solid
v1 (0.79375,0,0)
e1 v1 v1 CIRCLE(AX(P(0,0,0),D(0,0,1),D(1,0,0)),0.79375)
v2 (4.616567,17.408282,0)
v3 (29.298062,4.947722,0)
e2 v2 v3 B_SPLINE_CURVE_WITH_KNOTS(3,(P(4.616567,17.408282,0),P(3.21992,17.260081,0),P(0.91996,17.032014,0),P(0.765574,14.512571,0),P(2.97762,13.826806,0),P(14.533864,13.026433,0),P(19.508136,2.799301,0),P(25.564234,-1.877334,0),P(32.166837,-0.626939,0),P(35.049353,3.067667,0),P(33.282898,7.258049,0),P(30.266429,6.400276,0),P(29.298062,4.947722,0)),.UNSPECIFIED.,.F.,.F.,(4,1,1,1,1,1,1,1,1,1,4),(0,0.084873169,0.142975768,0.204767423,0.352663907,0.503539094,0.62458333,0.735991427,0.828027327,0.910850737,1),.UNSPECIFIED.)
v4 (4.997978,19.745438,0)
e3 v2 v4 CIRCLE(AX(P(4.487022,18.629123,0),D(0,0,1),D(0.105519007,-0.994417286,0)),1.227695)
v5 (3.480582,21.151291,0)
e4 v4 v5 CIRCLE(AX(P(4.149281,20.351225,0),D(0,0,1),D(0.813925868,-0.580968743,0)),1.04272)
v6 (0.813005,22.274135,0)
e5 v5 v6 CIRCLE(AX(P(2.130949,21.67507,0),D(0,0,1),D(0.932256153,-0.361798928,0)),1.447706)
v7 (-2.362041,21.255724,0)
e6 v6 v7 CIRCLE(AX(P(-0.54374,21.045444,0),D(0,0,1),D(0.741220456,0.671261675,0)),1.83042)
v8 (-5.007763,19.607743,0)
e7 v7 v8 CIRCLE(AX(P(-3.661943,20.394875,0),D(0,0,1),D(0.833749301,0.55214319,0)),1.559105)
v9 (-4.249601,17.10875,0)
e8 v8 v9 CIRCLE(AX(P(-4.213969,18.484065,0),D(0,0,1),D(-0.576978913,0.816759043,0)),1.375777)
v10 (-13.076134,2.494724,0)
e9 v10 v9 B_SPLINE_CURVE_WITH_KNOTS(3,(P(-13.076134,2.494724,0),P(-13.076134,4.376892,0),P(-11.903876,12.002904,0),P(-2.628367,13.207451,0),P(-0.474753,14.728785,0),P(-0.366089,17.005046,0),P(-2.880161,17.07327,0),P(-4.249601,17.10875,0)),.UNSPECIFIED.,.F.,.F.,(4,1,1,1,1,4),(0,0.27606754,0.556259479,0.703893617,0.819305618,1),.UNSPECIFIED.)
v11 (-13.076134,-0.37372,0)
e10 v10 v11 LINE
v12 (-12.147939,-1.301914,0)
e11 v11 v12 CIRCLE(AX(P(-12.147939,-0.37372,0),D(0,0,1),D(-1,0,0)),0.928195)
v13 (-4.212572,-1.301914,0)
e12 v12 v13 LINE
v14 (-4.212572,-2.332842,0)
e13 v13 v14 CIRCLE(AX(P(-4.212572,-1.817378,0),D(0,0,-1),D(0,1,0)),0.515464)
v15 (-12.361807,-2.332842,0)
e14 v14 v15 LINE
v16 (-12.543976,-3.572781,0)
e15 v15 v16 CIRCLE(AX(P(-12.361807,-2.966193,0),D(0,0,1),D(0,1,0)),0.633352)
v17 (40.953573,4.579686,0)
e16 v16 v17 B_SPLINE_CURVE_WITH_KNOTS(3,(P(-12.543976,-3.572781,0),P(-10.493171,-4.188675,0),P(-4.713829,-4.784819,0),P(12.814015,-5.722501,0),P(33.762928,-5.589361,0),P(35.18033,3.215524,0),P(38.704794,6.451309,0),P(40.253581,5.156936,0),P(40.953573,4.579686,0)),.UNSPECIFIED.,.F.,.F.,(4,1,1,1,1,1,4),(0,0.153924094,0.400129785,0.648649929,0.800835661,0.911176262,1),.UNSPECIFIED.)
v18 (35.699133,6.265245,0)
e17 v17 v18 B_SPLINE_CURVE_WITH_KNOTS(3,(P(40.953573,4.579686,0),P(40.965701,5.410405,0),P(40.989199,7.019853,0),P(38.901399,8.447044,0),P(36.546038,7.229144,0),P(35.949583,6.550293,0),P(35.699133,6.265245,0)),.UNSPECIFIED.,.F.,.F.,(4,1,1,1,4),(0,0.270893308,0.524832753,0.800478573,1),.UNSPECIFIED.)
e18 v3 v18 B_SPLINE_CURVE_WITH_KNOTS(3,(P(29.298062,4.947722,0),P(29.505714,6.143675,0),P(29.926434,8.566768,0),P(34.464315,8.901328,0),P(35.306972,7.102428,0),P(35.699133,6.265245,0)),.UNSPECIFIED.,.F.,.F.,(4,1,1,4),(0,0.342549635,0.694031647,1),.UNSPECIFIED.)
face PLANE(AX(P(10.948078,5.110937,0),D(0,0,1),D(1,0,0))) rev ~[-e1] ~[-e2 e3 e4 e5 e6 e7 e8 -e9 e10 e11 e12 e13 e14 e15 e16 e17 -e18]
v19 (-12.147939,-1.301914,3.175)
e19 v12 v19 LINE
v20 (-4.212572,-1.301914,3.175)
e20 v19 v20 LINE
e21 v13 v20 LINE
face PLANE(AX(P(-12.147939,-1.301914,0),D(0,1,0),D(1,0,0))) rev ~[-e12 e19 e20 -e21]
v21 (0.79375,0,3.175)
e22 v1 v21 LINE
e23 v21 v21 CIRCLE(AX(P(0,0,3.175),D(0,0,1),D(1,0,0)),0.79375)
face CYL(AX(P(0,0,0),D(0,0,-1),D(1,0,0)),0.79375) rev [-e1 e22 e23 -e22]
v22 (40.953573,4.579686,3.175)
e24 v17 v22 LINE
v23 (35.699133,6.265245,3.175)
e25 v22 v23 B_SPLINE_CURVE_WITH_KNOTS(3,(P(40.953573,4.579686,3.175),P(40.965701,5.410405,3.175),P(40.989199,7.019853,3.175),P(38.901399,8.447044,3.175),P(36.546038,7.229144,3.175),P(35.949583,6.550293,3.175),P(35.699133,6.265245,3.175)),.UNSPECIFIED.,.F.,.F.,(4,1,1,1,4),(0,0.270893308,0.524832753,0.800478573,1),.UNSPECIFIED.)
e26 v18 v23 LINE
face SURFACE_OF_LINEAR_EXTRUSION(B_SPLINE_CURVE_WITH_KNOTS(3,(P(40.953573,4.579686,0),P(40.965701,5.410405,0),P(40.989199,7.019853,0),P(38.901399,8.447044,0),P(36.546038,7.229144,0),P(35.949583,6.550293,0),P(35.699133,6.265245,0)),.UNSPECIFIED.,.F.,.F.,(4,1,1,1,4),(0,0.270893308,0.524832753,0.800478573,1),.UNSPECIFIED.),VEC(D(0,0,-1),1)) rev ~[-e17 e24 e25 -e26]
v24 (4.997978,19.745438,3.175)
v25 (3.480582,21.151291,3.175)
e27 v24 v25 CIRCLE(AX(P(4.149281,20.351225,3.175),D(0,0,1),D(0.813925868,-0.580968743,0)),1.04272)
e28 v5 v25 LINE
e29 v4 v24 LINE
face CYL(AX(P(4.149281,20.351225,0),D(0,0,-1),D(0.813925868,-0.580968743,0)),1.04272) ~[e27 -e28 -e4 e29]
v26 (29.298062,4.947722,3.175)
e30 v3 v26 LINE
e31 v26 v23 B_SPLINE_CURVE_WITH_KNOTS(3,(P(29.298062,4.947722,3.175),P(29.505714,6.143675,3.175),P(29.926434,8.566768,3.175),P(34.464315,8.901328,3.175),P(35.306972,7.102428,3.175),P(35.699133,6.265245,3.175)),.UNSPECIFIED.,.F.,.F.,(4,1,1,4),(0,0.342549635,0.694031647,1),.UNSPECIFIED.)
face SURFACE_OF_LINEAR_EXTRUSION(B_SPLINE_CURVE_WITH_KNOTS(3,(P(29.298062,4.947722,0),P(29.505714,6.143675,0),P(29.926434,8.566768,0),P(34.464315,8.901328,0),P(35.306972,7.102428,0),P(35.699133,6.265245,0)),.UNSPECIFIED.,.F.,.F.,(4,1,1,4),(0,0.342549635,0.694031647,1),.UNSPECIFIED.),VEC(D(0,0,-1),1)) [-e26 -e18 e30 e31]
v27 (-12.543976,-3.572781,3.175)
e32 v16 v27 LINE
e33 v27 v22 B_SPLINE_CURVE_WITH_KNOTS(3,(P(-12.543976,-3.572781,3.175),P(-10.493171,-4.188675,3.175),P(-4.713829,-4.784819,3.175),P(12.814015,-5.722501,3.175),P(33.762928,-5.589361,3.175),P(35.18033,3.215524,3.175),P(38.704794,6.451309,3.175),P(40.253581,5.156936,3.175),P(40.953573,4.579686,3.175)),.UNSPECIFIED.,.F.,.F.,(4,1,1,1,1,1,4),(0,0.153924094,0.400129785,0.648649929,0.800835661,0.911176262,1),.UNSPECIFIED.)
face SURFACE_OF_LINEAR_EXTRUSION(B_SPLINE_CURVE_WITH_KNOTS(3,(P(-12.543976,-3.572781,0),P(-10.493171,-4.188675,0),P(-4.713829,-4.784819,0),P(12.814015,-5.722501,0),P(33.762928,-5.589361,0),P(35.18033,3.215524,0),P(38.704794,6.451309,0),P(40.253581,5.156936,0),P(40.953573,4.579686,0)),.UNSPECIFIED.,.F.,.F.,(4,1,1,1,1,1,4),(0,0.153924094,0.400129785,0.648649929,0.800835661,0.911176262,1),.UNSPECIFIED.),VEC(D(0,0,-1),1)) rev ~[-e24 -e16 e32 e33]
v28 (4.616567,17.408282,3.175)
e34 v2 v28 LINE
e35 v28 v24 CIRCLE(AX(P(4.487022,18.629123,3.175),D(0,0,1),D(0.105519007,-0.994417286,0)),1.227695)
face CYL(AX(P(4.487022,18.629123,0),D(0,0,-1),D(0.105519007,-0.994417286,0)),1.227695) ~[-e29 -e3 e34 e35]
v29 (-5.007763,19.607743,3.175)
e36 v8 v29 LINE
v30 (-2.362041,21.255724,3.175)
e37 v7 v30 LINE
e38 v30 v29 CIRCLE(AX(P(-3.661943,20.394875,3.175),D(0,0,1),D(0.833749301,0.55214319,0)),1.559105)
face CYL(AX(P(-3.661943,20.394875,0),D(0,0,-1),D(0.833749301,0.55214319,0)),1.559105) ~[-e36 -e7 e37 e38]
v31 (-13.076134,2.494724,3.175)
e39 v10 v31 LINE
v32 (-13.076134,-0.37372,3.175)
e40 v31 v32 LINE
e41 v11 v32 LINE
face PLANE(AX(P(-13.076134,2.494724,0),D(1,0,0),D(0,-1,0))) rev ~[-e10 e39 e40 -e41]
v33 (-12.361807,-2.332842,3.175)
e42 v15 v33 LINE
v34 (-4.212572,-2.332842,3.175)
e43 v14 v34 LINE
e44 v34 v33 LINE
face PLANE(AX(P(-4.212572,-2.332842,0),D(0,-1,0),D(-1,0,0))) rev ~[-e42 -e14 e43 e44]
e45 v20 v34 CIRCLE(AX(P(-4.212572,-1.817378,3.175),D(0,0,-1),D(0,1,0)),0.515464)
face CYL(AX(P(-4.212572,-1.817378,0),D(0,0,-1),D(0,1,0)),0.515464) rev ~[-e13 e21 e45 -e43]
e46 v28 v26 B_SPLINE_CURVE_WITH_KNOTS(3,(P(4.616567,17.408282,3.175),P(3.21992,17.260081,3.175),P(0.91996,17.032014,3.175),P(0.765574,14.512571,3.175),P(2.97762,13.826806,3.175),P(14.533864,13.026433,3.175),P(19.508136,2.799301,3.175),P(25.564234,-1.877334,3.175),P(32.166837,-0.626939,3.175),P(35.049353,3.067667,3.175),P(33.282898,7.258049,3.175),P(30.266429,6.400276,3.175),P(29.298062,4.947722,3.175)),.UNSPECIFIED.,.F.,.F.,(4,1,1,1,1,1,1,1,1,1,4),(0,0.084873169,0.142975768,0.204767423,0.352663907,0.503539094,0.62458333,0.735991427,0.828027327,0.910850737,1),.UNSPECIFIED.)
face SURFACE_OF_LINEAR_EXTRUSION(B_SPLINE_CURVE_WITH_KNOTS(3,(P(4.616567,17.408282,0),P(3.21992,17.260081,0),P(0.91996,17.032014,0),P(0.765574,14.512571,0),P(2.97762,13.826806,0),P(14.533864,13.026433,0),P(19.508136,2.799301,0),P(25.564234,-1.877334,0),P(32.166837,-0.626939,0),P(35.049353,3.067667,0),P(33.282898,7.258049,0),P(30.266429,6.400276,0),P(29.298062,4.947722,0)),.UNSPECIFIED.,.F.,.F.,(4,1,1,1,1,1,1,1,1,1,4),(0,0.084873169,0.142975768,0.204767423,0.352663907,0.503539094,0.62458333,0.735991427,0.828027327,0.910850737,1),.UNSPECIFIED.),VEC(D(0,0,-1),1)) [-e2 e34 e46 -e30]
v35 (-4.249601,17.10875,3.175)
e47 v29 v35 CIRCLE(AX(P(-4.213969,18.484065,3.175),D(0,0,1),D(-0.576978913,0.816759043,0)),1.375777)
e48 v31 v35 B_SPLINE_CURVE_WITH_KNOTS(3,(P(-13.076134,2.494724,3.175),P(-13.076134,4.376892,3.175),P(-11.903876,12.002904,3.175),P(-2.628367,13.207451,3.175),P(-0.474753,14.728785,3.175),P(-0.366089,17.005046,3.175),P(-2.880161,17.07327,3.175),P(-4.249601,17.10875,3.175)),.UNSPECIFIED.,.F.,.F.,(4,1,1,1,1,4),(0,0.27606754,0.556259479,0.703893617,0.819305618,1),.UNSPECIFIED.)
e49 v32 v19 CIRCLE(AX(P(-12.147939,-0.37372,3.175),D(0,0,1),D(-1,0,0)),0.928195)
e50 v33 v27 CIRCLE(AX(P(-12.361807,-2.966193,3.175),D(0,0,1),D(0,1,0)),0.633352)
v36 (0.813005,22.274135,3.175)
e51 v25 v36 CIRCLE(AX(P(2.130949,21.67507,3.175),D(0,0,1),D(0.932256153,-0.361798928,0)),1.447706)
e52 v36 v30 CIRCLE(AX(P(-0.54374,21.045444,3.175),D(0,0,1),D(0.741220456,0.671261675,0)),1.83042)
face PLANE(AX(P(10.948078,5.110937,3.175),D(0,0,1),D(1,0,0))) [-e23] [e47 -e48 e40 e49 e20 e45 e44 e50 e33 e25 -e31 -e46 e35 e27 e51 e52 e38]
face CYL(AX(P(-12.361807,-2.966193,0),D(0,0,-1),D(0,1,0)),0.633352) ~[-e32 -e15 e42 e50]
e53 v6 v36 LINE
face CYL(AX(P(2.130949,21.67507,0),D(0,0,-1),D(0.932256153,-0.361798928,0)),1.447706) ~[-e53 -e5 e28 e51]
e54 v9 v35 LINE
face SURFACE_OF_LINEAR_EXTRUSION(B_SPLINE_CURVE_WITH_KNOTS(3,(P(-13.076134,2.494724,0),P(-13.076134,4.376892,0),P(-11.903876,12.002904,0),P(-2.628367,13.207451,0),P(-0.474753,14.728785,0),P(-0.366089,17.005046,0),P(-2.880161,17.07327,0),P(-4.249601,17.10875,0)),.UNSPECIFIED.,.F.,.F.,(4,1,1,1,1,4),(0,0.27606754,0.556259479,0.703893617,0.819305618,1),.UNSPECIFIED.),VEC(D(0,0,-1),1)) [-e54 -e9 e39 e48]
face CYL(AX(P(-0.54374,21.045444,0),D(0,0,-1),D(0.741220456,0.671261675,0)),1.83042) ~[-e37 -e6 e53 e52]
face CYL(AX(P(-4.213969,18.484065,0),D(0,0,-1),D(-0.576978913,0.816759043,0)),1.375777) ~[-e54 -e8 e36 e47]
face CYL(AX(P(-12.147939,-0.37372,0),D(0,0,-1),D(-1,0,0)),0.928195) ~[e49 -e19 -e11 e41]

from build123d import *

# Parameters (mm, degrees)
F0_R     = 0.79375
F1_DEPTH = 3.175


with BuildPart() as f1:
    # F0 (on Top) → F1 (new body)
    with BuildSketch(Plane.XY):
        with BuildLine():
            Line((-12.1479392274, -1.3019143497), (-4.2125724058, -1.3019143497))
            ThreePointArc((-4.2125724058, -1.3019143497), (-3.6971087737, -1.8173779818), (-4.2125724058, -2.3328416139))
            Line((-4.2125724058, -2.3328416139), (-12.3618070082, -2.3328416139))
            ThreePointArc((-12.3618070082, -2.3328416139), (-12.9884320145, -2.8741308978), (-12.5439763069, -3.5727811046))
            add(Edge.make_bspline(
                [(-12.5439763069, -3.5727811046), (-10.4931714013, -4.1886749677), (-4.7138291604, -4.7848193904), (12.8140150399, -5.7225010361), (33.7629279781, -5.5893612026), (35.1803298379, 3.2155238376), (38.704793611, 6.4513086996), (40.2535807312, 5.1569357022), (40.9535728395, 4.5796856284)],
                knots=[0, 0, 0, 0, 0.1539240942, 0.4001297847, 0.6486499295, 0.8008356609, 0.9111762625, 1, 1, 1, 1], degree=3))
            add(Edge.make_bspline(
                [(40.9535728395, 4.5796856284), (40.965701297, 5.4104047878), (40.9891991521, 7.0198525291), (38.9013991928, 8.4470442608), (36.5460384231, 7.2291437108), (35.9495828805, 6.5502929537), (35.6991328299, 6.265245378)],
                knots=[0, 0, 0, 0, 0.2708933082, 0.5248327526, 0.8004785728, 1, 1, 1, 1], degree=3))
            add(Edge.make_bspline(
                [(29.298061505, 4.9477219582), (29.5057141134, 6.1436753777), (29.9264341111, 8.5667680789), (34.4643150607, 8.9013279289), (35.3069719217, 7.1024284451), (35.6991328299, 6.265245378)],
                knots=[0, 0, 0, 0, 0.3425496354, 0.6940316468, 1, 1, 1, 1], degree=3))
            add(Edge.make_bspline(
                [(4.6165669337, 17.4082815647), (3.2199198099, 17.2600813875), (0.919960215, 17.0320137683), (0.7655736955, 14.5125706311), (2.9776196983, 13.8268059586), (14.5338640425, 13.026433318), (19.5081363717, 2.7993005588), (25.5642344469, -1.8773343082), (32.1668367918, -0.6269388113), (35.0493534583, 3.0676669167), (33.2828979966, 7.258048808), (30.2664286615, 6.4002764567), (29.298061505, 4.9477219582)],
                knots=[0, 0, 0, 0, 0.0848731693, 0.1429757683, 0.2047674234, 0.352663907, 0.5035390936, 0.62458333, 0.7359914274, 0.8280273266, 0.9108507368, 1, 1, 1, 1], degree=3))
            ThreePointArc((4.6165669337, 17.4082815647), (5.6986880334, 18.4313854961), (4.9979779286, 19.7454376555))
            ThreePointArc((4.9979779286, 19.7454376555), (4.8579461757, 21.1161164274), (3.4805820532, 21.1512911574))
            ThreePointArc((3.4805820532, 21.1512911574), (2.6925940729, 23.0093893607), (0.8130051428, 22.2741346806))
            ThreePointArc((0.8130051428, 22.2741346806), (-1.1028000419, 22.7883978959), (-2.3620408028, 21.2557241321))
            ThreePointArc((-2.3620408028, 21.2557241321), (-4.4862537289, 21.7182494133), (-5.0077626444, 19.6077426869))
            ThreePointArc((-5.0077626444, 19.6077426869), (-5.5304899467, 18.0846492582), (-4.2496006936, 17.1087495983))
            add(Edge.make_bspline(
                [(-13.0761340261, 2.4947237689), (-13.0761340261, 4.3768916706), (-11.9038757056, 12.0029035771), (-2.6283669134, 13.2074512479), (-0.4747531489, 14.728784633), (-0.3660887841, 17.0050457573), (-2.880160515, 17.0732696657), (-4.2496006936, 17.1087495983)],
                knots=[0, 0, 0, 0, 0.2760675401, 0.5562594785, 0.7038936174, 0.8193056178, 1, 1, 1, 1], degree=3))
            Line((-13.0761340261, 2.4947237689), (-13.0761340261, -0.3737195511))
            ThreePointArc((-13.0761340261, -0.3737195511), (-12.8042720638, -1.0300523875), (-12.1479392274, -1.3019143497))
        make_face()
        Circle(F0_R, mode=Mode.SUBTRACT)
    extrude(amount=F1_DEPTH)


solid = f1.part
